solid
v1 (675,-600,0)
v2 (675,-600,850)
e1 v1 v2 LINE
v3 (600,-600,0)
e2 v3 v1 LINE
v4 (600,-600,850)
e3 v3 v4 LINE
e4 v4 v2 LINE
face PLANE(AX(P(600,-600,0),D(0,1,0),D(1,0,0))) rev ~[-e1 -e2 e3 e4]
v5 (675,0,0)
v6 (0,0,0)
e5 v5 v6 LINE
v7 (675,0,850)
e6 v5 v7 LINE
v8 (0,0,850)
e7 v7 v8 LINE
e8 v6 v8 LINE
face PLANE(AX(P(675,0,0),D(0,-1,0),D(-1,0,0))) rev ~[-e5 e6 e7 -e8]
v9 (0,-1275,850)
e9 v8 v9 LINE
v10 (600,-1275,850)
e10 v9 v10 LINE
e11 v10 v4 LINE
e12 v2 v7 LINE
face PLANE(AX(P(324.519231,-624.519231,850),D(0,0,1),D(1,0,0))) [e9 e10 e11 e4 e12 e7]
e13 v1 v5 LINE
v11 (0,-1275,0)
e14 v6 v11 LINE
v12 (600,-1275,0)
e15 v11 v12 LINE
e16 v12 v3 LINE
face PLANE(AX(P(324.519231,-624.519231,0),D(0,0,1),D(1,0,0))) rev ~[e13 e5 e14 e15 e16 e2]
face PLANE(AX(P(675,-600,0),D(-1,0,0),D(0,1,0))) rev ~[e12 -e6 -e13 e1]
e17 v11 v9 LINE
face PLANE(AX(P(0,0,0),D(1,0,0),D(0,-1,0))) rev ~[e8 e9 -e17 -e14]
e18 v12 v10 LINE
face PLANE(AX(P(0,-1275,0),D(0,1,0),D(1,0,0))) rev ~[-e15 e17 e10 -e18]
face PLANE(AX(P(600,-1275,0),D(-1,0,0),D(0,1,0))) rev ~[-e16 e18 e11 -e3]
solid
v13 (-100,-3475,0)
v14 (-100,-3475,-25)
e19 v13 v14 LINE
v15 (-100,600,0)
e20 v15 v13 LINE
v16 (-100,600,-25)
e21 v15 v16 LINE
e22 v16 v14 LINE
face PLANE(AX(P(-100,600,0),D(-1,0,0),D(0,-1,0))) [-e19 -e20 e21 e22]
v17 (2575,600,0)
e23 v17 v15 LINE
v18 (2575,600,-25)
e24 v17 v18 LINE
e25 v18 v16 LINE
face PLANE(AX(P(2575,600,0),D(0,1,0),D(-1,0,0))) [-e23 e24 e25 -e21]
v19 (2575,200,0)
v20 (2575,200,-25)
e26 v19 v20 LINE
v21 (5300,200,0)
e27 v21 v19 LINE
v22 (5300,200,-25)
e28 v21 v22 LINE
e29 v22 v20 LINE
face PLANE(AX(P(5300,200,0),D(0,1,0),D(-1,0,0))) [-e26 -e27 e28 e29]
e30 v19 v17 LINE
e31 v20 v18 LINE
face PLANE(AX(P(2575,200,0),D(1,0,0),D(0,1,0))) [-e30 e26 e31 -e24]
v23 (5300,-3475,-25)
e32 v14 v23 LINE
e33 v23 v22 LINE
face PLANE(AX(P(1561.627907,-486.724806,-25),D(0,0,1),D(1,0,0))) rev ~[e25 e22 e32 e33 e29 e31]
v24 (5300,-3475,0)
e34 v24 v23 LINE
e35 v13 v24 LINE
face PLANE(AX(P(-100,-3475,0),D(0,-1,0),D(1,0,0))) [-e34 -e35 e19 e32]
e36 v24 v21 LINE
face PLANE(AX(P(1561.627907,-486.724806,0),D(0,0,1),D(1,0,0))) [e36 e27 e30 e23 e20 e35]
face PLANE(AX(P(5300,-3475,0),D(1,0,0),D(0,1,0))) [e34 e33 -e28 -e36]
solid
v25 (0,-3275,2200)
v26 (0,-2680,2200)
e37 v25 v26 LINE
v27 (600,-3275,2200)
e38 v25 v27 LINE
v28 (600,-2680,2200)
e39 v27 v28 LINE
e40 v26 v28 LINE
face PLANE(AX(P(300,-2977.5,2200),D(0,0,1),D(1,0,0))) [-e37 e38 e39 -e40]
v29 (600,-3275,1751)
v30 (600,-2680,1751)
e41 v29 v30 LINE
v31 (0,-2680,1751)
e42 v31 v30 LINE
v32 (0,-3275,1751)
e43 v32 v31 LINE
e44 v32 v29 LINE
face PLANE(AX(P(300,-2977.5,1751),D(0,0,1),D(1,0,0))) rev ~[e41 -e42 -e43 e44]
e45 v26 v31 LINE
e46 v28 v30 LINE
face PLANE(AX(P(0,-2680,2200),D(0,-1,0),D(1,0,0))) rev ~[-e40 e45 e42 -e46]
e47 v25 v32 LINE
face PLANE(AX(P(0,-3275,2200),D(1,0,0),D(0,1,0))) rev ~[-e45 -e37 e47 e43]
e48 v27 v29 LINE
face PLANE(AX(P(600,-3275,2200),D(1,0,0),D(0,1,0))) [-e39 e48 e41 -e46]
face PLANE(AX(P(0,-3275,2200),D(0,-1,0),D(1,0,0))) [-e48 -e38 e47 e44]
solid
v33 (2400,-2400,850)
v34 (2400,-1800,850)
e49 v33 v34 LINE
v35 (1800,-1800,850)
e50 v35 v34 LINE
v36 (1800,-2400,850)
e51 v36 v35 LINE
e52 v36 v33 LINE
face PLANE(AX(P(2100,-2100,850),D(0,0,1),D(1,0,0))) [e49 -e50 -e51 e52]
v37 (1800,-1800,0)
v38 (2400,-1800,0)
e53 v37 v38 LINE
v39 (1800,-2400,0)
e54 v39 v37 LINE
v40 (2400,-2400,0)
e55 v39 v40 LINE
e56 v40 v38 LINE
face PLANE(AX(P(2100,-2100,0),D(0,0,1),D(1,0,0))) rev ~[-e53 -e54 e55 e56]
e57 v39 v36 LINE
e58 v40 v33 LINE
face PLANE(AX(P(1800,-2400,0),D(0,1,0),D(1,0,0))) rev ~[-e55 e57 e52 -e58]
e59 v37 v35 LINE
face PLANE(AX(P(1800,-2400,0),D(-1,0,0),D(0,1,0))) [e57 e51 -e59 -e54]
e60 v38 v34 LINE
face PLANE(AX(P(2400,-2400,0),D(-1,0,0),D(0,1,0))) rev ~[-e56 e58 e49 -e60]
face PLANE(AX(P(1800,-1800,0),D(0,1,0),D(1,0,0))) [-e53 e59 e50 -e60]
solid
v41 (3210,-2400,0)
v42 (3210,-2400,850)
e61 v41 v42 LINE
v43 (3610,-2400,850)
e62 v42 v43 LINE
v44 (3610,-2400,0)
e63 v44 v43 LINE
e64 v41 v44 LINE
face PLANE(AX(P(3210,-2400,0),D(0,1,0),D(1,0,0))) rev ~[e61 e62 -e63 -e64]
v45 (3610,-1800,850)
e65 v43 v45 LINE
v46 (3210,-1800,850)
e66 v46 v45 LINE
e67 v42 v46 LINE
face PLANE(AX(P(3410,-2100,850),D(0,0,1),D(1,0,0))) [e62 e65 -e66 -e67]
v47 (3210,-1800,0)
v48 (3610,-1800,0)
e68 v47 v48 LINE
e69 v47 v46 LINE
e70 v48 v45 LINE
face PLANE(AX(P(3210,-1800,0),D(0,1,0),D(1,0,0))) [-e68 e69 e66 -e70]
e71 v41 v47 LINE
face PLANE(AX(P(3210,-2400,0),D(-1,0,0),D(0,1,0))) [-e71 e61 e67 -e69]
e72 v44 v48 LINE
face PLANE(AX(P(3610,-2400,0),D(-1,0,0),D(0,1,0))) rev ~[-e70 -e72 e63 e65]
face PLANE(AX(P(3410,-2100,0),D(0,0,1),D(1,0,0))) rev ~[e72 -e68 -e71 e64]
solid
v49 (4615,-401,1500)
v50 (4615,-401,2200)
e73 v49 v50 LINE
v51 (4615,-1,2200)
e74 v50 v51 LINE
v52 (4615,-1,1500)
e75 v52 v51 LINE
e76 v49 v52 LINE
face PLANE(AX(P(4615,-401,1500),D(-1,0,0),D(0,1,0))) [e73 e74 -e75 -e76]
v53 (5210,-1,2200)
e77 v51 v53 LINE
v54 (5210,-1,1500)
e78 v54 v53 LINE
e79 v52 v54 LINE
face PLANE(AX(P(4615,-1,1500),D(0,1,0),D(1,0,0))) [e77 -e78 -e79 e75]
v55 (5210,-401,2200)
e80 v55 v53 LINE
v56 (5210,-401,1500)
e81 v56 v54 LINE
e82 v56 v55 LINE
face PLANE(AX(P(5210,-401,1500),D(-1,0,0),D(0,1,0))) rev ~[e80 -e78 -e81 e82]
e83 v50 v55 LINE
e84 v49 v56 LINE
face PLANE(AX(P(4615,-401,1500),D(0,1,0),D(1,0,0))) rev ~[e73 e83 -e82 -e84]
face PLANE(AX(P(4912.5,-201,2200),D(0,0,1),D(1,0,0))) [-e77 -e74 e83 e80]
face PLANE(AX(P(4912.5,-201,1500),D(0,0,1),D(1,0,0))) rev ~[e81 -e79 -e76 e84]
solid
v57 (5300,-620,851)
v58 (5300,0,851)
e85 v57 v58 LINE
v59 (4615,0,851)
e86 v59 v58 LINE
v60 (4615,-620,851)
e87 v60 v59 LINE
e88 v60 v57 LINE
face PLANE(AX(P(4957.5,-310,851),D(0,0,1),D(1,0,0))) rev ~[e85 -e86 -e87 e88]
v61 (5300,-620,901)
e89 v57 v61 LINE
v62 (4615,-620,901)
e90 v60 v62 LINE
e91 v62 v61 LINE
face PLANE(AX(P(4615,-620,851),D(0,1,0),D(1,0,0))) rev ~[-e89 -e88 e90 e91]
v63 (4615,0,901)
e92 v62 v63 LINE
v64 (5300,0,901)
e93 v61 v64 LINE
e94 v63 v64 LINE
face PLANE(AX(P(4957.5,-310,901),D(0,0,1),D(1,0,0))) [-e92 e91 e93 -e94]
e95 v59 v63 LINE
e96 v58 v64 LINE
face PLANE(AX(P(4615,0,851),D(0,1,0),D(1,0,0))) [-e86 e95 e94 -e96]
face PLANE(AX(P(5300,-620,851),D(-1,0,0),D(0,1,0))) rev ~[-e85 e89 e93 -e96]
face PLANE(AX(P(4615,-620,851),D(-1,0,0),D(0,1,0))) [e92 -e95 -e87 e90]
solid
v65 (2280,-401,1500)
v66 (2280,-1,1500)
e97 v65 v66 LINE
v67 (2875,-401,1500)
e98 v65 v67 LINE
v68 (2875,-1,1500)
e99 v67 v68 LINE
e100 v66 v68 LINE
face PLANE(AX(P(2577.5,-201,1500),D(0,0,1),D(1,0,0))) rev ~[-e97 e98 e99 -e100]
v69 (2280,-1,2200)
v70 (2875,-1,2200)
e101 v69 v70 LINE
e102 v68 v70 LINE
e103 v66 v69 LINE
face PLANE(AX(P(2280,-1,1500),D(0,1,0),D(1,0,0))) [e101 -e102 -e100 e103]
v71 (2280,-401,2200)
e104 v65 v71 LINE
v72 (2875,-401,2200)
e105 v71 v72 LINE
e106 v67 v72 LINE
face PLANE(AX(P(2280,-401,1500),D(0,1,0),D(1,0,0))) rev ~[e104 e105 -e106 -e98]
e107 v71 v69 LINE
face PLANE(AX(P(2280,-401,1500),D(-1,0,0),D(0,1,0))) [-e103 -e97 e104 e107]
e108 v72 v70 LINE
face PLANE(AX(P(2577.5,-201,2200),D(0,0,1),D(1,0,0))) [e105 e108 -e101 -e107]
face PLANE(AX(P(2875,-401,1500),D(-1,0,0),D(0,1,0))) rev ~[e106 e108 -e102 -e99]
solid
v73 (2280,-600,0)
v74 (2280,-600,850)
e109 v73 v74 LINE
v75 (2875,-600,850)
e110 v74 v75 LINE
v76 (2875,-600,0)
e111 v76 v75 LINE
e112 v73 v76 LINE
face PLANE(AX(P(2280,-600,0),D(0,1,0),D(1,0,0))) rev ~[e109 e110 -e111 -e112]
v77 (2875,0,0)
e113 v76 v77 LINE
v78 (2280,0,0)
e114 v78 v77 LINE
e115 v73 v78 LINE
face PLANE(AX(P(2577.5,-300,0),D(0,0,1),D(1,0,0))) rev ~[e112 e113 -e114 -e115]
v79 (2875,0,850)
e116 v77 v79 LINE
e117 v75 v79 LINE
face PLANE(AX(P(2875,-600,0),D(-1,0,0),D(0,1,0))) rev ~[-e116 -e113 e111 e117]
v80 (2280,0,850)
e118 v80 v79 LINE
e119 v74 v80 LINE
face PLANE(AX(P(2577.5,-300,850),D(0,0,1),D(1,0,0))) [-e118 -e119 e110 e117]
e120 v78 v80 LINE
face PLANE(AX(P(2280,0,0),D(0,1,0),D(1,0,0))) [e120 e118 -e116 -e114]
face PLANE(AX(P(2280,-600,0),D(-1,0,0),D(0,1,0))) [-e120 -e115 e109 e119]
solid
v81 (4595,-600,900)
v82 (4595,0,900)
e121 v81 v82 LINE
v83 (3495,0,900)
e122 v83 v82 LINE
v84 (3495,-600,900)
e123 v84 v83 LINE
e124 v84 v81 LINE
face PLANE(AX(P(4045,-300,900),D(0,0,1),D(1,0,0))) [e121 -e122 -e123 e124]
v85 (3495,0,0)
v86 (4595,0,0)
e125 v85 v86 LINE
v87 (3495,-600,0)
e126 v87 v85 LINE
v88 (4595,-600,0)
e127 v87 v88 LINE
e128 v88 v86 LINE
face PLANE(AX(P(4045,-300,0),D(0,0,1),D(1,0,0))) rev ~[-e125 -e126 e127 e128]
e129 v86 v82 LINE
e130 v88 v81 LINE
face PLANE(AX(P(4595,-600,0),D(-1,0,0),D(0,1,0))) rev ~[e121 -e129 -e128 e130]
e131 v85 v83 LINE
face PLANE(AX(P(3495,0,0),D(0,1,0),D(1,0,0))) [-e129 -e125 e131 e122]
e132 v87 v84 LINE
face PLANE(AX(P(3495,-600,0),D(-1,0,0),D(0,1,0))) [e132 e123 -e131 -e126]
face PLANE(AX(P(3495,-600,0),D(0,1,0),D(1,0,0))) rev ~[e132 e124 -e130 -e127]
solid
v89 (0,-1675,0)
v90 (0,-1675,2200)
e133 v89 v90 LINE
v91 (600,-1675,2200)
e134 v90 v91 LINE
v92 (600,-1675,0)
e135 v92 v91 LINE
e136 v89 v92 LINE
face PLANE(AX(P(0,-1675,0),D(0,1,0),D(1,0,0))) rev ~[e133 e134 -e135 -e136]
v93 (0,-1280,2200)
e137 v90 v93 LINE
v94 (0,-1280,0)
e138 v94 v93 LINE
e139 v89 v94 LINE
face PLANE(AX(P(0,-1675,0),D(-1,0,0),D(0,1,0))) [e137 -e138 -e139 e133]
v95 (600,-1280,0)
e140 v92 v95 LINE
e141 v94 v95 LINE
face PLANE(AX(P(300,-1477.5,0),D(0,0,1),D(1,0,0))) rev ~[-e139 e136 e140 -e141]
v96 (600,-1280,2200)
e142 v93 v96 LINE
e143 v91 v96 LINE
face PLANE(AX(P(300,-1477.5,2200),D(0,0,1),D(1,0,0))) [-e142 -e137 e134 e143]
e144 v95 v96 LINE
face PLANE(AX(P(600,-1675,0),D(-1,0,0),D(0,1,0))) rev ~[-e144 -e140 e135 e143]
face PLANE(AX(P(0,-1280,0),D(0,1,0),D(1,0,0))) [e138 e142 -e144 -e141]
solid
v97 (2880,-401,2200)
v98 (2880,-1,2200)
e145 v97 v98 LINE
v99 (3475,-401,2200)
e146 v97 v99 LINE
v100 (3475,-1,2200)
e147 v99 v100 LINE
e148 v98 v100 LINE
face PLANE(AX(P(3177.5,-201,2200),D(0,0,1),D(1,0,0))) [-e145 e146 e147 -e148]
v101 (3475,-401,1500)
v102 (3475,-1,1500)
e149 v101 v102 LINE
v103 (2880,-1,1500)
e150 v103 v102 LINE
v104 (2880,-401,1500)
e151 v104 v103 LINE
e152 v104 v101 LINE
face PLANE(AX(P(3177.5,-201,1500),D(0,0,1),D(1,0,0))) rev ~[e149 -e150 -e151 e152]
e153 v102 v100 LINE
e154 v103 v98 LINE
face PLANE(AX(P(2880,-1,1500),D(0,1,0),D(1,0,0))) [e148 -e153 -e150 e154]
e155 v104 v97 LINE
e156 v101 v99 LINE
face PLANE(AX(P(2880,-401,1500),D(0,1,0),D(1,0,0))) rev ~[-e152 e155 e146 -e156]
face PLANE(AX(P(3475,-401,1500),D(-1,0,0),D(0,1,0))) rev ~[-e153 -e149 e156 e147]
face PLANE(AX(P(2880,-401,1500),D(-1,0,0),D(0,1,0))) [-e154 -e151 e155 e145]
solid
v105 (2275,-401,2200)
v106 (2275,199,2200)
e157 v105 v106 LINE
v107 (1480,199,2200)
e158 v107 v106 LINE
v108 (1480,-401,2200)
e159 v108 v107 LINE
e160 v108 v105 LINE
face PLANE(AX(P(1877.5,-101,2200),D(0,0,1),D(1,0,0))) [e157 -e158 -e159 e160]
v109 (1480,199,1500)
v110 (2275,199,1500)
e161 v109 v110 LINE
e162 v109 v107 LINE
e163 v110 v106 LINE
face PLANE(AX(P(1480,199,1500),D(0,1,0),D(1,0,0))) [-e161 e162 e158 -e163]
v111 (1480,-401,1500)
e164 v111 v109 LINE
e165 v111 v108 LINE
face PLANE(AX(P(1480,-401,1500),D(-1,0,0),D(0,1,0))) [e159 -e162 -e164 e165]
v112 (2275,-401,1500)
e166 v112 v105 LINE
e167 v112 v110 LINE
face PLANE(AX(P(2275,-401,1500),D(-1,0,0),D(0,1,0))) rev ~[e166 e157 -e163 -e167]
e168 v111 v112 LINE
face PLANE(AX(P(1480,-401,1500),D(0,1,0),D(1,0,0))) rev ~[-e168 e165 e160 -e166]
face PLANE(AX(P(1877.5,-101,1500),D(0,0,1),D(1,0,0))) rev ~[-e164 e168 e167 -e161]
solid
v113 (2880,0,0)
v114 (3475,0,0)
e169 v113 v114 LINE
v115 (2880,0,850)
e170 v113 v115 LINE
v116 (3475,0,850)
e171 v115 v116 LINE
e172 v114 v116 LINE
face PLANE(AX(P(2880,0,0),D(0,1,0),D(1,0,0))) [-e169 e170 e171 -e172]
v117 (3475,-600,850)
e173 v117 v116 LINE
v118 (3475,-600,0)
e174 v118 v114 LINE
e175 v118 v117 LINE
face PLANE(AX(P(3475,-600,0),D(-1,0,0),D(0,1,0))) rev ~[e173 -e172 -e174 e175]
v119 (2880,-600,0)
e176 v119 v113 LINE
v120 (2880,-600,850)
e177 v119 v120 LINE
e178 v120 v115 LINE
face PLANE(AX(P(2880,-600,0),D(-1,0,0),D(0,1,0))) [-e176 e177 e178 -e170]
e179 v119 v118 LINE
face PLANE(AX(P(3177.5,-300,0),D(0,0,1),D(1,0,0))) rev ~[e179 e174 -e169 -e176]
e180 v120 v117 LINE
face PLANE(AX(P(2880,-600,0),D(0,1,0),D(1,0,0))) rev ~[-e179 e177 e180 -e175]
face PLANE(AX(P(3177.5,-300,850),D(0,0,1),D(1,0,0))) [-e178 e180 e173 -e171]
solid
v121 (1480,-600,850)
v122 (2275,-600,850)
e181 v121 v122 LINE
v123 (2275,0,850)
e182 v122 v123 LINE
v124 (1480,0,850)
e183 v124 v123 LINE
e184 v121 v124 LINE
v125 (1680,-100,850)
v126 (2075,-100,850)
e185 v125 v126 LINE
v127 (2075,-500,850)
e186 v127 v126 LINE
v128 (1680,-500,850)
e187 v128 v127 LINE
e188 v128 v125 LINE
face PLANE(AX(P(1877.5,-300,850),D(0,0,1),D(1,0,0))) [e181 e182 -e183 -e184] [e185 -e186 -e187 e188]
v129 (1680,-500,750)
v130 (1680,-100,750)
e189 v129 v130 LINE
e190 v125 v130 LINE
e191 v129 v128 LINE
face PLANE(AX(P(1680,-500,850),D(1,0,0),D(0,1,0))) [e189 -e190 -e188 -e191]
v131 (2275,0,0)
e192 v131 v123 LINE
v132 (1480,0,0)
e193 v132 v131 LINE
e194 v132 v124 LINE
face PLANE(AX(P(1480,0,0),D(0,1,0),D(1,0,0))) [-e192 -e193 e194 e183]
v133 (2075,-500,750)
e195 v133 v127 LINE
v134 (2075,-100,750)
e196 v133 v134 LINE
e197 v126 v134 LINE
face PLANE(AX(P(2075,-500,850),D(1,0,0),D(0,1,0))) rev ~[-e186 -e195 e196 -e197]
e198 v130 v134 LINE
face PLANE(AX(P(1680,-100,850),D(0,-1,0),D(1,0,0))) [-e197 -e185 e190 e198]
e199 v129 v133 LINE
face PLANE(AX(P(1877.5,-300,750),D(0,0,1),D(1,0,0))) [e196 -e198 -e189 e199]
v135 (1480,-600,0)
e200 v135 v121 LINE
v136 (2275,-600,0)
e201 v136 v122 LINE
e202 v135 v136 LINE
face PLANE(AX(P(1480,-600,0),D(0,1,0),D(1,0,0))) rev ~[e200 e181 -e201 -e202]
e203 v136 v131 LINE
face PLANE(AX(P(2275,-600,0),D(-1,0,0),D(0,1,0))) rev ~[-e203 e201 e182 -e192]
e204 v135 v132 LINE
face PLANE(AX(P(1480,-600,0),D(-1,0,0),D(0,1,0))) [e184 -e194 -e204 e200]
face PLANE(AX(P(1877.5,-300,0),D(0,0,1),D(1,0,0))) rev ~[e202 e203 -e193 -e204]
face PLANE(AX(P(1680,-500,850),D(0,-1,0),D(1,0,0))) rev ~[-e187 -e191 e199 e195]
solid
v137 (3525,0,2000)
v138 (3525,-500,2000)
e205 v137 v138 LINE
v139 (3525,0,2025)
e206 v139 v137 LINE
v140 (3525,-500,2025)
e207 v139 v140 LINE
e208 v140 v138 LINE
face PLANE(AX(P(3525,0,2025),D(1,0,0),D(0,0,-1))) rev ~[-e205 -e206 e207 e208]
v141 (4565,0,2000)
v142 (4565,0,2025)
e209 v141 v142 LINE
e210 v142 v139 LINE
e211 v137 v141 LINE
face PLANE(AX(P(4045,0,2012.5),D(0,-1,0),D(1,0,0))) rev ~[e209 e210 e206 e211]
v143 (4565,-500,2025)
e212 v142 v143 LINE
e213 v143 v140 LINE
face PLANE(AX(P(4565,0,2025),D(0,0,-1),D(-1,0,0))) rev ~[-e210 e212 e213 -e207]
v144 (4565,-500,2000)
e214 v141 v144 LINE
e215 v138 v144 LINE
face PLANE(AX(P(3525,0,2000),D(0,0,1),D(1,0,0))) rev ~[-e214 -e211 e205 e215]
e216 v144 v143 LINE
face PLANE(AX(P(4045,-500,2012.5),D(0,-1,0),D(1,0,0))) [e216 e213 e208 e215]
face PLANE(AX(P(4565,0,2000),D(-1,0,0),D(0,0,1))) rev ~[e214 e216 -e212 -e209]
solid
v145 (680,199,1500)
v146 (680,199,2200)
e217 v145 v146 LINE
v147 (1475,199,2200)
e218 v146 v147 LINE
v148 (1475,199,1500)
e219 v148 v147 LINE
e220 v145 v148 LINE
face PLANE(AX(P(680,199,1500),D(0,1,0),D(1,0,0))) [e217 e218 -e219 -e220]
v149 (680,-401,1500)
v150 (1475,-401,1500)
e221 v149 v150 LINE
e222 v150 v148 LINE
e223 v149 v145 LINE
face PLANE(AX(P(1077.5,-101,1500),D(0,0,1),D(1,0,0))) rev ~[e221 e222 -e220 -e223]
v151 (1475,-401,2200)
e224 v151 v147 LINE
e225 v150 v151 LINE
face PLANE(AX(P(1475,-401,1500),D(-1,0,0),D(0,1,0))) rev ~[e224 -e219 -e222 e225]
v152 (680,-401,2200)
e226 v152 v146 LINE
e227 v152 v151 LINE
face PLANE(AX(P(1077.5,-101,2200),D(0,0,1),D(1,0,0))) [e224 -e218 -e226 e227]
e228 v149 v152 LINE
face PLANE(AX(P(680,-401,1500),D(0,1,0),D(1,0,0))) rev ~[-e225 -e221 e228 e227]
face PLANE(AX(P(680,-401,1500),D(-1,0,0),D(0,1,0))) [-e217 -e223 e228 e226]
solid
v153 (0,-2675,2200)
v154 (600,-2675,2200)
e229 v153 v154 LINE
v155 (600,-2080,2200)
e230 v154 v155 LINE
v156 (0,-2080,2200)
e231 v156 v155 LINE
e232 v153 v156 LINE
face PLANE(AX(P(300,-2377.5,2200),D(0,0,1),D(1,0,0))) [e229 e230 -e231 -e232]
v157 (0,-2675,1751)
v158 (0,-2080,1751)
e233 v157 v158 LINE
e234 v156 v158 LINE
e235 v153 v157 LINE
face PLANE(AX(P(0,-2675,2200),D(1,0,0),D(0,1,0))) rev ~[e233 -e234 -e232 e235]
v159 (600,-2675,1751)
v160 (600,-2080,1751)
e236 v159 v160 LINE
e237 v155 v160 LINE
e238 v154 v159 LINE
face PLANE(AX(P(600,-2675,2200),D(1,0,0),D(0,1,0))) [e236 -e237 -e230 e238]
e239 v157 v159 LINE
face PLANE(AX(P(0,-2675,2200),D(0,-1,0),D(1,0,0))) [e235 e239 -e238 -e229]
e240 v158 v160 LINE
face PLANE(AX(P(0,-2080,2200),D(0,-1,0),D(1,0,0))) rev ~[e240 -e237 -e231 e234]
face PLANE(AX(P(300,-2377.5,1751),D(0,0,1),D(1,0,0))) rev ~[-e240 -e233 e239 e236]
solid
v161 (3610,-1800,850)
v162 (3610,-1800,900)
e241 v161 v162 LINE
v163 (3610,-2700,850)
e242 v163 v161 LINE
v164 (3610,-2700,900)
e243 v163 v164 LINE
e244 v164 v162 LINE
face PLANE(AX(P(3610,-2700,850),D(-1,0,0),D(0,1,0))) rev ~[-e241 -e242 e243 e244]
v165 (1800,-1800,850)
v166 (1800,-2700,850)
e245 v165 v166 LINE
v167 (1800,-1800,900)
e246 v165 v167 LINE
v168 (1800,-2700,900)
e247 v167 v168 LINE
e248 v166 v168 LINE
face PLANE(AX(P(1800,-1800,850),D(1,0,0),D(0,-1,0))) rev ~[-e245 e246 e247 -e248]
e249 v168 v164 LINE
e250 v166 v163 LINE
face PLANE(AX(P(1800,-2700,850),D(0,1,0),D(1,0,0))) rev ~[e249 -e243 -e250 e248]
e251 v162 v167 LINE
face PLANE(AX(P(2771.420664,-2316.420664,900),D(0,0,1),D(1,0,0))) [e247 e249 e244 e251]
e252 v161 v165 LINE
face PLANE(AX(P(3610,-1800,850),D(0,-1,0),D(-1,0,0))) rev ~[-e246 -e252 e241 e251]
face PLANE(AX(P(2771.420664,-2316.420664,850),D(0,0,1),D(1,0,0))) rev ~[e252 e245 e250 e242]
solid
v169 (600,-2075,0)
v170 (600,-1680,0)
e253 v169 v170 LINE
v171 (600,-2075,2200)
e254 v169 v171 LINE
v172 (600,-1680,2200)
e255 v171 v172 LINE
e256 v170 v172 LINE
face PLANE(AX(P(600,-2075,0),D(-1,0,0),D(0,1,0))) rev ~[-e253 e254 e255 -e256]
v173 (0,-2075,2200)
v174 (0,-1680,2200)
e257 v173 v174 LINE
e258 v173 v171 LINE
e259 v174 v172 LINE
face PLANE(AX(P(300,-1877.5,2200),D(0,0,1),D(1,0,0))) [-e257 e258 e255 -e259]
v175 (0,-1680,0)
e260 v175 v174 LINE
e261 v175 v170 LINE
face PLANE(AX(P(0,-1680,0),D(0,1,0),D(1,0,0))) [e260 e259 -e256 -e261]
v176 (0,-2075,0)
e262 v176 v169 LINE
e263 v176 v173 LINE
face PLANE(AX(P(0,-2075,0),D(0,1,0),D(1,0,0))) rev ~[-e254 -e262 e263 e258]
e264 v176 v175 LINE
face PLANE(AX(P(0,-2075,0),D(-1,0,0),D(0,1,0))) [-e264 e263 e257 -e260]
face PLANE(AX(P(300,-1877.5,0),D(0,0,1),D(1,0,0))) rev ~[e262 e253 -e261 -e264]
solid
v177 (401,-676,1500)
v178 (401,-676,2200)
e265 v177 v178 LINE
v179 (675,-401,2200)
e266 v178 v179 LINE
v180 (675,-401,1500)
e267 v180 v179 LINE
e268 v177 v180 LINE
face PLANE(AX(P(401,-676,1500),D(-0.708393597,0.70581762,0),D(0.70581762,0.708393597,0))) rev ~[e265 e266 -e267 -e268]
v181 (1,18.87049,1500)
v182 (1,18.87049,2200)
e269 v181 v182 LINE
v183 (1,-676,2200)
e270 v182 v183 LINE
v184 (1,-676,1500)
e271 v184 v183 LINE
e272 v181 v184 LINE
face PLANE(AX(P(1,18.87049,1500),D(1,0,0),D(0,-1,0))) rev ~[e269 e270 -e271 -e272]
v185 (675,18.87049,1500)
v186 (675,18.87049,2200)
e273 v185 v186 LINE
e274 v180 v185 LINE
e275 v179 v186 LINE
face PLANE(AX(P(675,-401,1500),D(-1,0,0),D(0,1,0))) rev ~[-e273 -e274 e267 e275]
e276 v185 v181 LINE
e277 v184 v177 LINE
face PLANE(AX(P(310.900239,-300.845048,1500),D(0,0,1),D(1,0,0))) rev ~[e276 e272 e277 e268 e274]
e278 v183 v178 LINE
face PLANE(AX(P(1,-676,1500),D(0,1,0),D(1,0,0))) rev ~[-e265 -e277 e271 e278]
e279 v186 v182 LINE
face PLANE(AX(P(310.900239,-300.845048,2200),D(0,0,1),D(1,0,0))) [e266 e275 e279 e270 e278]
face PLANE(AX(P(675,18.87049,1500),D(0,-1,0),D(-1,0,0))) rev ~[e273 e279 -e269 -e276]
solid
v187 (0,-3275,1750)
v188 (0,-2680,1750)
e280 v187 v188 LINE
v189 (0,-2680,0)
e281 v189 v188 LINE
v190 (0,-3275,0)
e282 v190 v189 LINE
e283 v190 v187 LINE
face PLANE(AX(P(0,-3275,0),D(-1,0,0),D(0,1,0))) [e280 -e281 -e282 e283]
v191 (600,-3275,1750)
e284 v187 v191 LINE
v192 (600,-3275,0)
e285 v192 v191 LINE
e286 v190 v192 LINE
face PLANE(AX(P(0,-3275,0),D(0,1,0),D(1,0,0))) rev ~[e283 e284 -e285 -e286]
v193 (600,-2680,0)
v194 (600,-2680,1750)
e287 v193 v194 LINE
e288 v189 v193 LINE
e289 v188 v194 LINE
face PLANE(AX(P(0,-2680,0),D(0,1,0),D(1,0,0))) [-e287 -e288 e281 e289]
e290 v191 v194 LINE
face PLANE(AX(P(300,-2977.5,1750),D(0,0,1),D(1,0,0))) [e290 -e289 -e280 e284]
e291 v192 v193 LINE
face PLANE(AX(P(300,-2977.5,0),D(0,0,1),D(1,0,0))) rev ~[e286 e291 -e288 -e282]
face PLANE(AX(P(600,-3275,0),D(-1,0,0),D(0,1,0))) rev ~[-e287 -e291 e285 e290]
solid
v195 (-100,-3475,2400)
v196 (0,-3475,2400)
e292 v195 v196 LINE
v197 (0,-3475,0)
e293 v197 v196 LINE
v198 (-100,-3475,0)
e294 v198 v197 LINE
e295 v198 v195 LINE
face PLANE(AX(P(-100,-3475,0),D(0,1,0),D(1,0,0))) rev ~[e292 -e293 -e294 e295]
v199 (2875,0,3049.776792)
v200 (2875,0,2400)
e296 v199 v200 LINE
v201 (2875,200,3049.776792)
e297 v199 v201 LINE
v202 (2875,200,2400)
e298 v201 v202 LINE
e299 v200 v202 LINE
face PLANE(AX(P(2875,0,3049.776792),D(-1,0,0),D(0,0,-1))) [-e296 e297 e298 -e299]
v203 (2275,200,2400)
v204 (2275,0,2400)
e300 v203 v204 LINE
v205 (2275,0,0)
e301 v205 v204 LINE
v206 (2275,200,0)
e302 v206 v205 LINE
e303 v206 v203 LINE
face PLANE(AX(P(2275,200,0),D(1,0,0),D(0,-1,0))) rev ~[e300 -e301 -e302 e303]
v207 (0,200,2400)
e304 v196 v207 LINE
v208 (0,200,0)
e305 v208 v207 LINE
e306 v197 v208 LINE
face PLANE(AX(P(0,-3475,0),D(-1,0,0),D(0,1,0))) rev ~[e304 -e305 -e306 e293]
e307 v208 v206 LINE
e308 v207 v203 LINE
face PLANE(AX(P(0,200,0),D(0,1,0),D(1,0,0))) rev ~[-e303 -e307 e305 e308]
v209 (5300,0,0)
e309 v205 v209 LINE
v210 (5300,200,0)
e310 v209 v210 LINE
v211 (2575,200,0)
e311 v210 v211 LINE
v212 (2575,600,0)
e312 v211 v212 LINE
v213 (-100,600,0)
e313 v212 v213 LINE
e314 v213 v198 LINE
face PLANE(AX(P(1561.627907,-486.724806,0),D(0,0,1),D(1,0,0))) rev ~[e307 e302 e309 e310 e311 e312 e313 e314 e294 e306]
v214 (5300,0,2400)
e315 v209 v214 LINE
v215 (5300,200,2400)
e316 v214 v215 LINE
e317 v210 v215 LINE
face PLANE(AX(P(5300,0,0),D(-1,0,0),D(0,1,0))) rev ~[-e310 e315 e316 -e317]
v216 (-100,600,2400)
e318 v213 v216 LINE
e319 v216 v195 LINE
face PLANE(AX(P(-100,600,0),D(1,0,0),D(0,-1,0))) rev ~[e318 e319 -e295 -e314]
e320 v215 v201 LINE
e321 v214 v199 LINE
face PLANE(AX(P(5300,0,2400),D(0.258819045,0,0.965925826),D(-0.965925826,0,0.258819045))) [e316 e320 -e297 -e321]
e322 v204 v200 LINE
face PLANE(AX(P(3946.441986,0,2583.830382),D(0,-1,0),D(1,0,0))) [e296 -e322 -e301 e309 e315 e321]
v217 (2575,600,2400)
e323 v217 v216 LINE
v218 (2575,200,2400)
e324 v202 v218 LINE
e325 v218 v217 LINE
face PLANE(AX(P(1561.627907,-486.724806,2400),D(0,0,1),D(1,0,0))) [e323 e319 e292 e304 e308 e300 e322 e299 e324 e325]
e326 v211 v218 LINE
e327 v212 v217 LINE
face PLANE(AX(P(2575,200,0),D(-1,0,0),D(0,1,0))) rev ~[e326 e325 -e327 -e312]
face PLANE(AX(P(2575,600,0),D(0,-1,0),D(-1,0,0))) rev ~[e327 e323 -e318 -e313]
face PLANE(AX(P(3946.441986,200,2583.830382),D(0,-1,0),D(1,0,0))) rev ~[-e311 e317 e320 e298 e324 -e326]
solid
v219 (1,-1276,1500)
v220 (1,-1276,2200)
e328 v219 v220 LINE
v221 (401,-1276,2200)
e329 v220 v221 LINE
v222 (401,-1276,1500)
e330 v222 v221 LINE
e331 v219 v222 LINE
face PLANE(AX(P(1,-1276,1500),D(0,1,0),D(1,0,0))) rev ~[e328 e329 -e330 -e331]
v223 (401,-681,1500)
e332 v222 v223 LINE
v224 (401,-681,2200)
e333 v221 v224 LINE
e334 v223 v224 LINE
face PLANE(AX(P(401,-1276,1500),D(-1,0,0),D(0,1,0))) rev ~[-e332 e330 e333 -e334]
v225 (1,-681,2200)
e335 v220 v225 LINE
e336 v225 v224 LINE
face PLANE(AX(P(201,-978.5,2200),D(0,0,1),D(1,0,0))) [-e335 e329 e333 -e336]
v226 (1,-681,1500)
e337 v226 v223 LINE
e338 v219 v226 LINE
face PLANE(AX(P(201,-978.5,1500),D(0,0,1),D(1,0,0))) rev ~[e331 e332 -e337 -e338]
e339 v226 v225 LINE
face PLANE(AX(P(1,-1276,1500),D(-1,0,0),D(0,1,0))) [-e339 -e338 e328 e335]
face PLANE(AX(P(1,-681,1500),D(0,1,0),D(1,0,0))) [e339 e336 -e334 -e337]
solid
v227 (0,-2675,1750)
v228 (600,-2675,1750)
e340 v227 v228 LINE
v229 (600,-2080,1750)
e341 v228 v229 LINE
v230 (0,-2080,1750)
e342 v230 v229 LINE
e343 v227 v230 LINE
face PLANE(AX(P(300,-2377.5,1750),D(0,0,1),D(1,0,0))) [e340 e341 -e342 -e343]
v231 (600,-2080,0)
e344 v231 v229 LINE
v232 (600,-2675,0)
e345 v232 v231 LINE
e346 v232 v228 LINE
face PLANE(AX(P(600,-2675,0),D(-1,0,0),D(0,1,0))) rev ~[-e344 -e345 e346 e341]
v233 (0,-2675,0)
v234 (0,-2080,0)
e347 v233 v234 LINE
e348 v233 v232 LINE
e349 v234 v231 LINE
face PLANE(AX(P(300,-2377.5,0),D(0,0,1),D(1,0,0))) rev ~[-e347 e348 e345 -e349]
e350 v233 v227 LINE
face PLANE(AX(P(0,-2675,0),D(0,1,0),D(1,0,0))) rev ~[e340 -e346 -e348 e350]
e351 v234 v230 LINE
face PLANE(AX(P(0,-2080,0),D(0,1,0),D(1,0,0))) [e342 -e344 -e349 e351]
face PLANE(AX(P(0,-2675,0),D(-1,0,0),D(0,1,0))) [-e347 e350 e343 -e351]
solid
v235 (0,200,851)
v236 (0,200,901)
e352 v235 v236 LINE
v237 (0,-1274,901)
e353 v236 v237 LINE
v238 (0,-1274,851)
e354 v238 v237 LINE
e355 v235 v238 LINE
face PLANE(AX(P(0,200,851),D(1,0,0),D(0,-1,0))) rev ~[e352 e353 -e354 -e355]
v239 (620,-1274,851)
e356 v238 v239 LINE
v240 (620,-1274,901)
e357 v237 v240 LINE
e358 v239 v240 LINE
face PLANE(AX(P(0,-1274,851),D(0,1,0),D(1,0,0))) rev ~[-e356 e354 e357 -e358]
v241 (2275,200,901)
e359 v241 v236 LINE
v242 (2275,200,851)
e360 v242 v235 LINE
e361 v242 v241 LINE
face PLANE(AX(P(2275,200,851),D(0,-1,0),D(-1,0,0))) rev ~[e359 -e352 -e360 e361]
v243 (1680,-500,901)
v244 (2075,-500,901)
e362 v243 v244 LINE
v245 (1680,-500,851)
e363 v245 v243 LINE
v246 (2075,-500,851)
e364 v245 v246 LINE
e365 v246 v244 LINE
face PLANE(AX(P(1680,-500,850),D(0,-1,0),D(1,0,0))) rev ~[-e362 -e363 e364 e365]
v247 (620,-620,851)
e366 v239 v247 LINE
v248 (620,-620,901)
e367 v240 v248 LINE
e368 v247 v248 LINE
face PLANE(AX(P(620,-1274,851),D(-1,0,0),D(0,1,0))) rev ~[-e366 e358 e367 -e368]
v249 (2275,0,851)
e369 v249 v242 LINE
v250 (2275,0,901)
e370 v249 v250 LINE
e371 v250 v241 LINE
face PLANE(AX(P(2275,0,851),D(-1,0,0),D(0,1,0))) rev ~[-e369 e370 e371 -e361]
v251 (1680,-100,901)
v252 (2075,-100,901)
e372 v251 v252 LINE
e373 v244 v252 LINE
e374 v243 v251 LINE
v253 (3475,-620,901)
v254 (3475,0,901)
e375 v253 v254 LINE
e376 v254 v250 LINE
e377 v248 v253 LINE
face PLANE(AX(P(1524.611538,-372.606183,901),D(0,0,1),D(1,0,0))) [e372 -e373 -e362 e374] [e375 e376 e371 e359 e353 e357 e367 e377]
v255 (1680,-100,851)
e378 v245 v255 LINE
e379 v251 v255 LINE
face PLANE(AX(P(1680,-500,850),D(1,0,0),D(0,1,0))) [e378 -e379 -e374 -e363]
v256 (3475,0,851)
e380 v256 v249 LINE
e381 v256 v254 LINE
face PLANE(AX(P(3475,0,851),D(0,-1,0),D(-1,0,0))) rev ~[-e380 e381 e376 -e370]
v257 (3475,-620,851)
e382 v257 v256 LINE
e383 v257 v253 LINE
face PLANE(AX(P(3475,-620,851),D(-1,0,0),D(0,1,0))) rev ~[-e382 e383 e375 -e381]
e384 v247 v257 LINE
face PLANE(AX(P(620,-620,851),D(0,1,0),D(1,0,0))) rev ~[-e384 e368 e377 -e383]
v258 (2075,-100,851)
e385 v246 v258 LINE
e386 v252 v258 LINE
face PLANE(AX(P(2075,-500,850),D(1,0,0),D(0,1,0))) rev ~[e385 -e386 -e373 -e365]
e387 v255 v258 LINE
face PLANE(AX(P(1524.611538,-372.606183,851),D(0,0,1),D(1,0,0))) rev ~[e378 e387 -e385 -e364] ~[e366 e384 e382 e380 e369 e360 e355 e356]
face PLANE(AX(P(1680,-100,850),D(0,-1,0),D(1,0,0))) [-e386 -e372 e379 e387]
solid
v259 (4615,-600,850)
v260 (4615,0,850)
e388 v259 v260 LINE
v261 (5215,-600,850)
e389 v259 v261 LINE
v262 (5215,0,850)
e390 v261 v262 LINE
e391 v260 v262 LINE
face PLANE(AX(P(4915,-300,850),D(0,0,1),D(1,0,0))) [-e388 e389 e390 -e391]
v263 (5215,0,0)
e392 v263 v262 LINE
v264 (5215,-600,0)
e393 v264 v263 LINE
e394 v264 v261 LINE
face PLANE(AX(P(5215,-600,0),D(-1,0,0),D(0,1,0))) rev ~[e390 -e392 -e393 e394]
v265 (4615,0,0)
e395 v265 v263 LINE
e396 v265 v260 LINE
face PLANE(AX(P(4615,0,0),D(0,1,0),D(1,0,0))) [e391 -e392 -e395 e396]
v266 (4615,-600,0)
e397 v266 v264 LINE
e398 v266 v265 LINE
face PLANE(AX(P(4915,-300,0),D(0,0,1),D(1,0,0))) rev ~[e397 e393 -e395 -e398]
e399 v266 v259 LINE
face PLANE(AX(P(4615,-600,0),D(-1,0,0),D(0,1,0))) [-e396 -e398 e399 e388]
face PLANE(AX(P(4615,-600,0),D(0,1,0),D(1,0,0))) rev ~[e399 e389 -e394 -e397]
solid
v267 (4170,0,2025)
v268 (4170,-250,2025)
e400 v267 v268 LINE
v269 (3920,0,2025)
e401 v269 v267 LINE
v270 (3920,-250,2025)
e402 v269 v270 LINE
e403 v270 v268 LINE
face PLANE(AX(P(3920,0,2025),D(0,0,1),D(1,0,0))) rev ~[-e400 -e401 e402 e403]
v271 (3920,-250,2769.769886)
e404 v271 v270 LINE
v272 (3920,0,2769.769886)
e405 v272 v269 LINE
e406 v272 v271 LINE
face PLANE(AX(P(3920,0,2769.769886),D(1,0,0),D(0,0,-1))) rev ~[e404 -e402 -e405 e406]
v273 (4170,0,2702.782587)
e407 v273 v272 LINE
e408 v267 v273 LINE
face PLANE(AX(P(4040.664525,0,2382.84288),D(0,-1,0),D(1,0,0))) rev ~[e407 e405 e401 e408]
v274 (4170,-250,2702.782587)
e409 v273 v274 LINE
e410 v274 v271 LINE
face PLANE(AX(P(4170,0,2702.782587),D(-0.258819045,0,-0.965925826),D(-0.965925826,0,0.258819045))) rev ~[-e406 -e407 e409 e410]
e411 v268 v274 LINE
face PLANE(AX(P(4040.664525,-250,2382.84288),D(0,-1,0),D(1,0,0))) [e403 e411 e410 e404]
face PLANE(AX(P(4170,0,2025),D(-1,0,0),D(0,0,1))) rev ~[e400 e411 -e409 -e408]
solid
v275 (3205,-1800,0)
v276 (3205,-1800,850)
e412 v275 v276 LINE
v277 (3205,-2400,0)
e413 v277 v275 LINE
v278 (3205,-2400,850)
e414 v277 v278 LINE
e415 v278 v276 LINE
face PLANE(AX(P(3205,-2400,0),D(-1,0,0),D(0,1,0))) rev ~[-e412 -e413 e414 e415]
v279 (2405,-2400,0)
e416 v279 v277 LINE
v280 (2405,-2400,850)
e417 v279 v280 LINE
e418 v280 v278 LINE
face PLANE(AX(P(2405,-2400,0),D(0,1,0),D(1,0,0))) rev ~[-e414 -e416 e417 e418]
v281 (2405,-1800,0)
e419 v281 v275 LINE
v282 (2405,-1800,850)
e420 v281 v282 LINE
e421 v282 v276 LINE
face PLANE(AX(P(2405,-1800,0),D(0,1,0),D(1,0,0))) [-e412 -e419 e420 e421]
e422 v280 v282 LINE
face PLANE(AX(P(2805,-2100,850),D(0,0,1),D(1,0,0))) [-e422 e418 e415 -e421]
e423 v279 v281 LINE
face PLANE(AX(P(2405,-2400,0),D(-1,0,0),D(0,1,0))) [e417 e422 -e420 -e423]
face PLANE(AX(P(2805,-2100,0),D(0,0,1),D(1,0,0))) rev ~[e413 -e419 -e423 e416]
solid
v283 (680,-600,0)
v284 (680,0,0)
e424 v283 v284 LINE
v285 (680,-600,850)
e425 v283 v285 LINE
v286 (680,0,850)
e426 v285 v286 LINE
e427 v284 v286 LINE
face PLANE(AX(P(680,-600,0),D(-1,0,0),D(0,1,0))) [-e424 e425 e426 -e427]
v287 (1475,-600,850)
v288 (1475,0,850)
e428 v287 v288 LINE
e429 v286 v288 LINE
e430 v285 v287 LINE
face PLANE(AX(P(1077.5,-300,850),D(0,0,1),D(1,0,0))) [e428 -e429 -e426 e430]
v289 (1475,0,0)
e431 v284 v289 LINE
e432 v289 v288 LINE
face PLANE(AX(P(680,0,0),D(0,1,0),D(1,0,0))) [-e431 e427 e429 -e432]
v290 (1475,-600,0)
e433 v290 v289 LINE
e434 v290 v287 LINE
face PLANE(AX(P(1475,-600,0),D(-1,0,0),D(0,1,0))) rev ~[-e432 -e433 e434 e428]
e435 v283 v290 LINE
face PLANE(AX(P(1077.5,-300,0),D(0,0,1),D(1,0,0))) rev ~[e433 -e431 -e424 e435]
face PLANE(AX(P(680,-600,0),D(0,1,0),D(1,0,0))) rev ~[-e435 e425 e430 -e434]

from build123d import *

# Parameters (mm, degrees)
F1_DEPTH  = 2400
F3_DEPTH  = 850
F4_W      = 600
F4_H      = 395
F5_DEPTH  = 2200
F6_DEPTH  = 2200
F4_H_2    = 595
F7_DEPTH  = 1750
F8_DEPTH  = 1750
F2_W      = 795
F2_H      = 600
F9_DEPTH  = 850
F10_DEPTH = 850
F2_W_2    = 595
F11_DEPTH = 850
F12_DEPTH = 850
F2_W_3    = 1100
F13_DEPTH = 900
F2_W_4    = 600
F14_DEPTH = 850
F16_W     = 795
F16_H     = 600
F17_DEPTH = 700
F18_DEPTH = 700
F19_DEPTH = 25
F16_W_2   = 595
F16_H_2   = 400
F20_DEPTH = 700
F22_DEPTH = 200
F24_DEPTH = 250
F25_DEPTH = 500
F26_DEPTH = 700
F16_W_3   = 400
F16_H_3   = 595
F27_DEPTH = 700
F31_DEPTH = 50
F30_W     = 685
F30_H     = 620
F28_W     = 395
F28_H     = 400
F32_DEPTH = 100
F33_W     = 600
F33_H     = 595
F34_DEPTH = 449
F35_W     = 600
F35_H     = 600
F36_DEPTH = 850
F35_W_2   = 800
F35_W_3   = 400
F37_W     = 600
F37_H     = 600
F38_DEPTH = 50


# Not quite as in the source:
# - a feature names something its author has since deleted; it is built from what else it names


with BuildPart() as f1:
    # F0 (on Top) → F1 (new body)
    with BuildSketch(Plane.XY):
        Polygon((0, -3475), (0, 200), (2275, 200), (2275, 0), (5300, 0), (5300, 200), (2575, 200), (2575, 600), (-100, 600), (-100, -3475), align=None)
    extrude(amount=F1_DEPTH)

    # F21 (on face) → F22 (join)
    with BuildSketch(Plane.XZ):
        Polygon((2875, 2400), (5300, 2400), (2875, 3049.7767916455), align=None)
    extrude(amount=-F22_DEPTH)


with BuildPart() as f3:
    # F2 (on Top) → F3 (new body)
    with BuildSketch(Plane.XY):
        Polygon((675, 0), (0, 0), (0, -1275), (600, -1275), (600, -600), (675, -600), align=None)
    extrude(amount=F3_DEPTH)


with BuildPart() as f5:
    # F4 (on Top) → F5 (new body)
    with BuildSketch(Plane.XY):
        with Locations((300, -1477.5)):
            Rectangle(F4_W, F4_H)
    extrude(amount=F5_DEPTH)


with BuildPart() as f6:
    # F4 (on Top) → F6 (new body)
    with BuildSketch(Plane.XY):
        with Locations((300, -1877.5)):
            Rectangle(F4_W, F4_H)
    extrude(amount=F6_DEPTH)


with BuildPart() as f7:
    # F4 (on Top) → F7 (new body)
    with BuildSketch(Plane.XY):
        with Locations((300, -2377.5)):
            Rectangle(F4_W, F4_H_2)
    extrude(amount=F7_DEPTH)


with BuildPart() as f8:
    # F4 (on Top) → F8 (new body)
    with BuildSketch(Plane.XY):
        with Locations((300, -2977.5)):
            Rectangle(F4_W, F4_H_2)
    extrude(amount=F8_DEPTH)


with BuildPart() as f9:
    # F2 (on Top) → F9 (new body)
    with BuildSketch(Plane.XY):
        with Locations((1077.5, -300)):
            Rectangle(F2_W, F2_H)
    extrude(amount=F9_DEPTH)


with BuildPart() as f10:
    # F2 (on Top) → F10 (new body)
    with BuildSketch(Plane.XY):
        with Locations((1877.5, -300)):
            Rectangle(F2_W, F2_H)
    extrude(amount=F10_DEPTH)


with BuildPart() as f11:
    # F2 (on Top) → F11 (new body)
    with BuildSketch(Plane.XY):
        with Locations((2577.5, -300)):
            Rectangle(F2_W_2, F2_H)
    extrude(amount=F11_DEPTH)


with BuildPart() as f12:
    # F2 (on Top) → F12 (new body)
    with BuildSketch(Plane.XY):
        with Locations((3177.5, -300)):
            Rectangle(F2_W_2, F2_H)
    extrude(amount=F12_DEPTH)


with BuildPart() as f13:
    # F2 (on Top) → F13 (new body)
    with BuildSketch(Plane.XY):
        with Locations((4045, -300)):
            Rectangle(F2_W_3, F2_H)
    extrude(amount=F13_DEPTH)


with BuildPart() as f14:
    # F2 (on Top) → F14 (new body)
    with BuildSketch(Plane.XY):
        with Locations((4915, -300)):
            Rectangle(F2_W_4, F2_H)
    extrude(amount=F14_DEPTH)


with BuildPart() as f17:
    # F16 (on offset) → F17 (new body)
    with BuildSketch(Plane.XY.offset(1500)):
        with Locations((1077.5, -101)):
            Rectangle(F16_W, F16_H)
    extrude(amount=F17_DEPTH)


with BuildPart() as f18:
    # F16 (on offset) → F18 (new body)
    with BuildSketch(Plane.XY.offset(1500)):
        with Locations((1877.5, -101)):
            Rectangle(F16_W, F16_H)
    extrude(amount=F18_DEPTH)


with BuildPart() as f19:
    # F0 (on Top) → F19 (new body)
    with BuildSketch(Plane.XY):
        Polygon((0, -3475), (0, 200), (2275, 200), (2275, 0), (5300, 0), (5300, 200), (2575, 200), (2575, 600), (-100, 600), (-100, -3475), align=None)
        Polygon((2275, 200), (0, 200), (0, -3475), (5300, -3475), (5300, 0), (2275, 0), align=None)
    extrude(amount=-F19_DEPTH)


with BuildPart() as f20:
    # F16 (on offset) → F20 (new body)
    with BuildSketch(Plane.XY.offset(1500)):
        with Locations((2577.5, -201)):
            Rectangle(F16_W_2, F16_H_2)
    extrude(amount=F20_DEPTH)


with BuildPart() as f20b:
    # F16 (on offset) → F20, piece 2 (new body)
    with BuildSketch(Plane.XY.offset(1500)):
        with Locations((3177.5, -201)):
            Rectangle(F16_W_2, F16_H_2)
    extrude(amount=F20_DEPTH)


with BuildPart() as f20c:
    # F16 (on offset) → F20, piece 3 (new body)
    with BuildSketch(Plane.XY.offset(1500)):
        with Locations((4912.5, -201)):
            Rectangle(F16_W_2, F16_H_2)
    extrude(amount=F20_DEPTH)


with BuildPart() as f24:
    # F23 (on face) → F24 (new body)
    with BuildSketch(Plane.XZ):
        Polygon((3920, 2769.769885555), (3920, 2025), (4170, 2025), (4170, 2702.7825874472), align=None)
    extrude(amount=F24_DEPTH)


with BuildPart() as f25:
    # F23 (on face) → F25 (new body)
    with BuildSketch(Plane.XZ):
        Polygon((3525, 2025), (3525, 2000), (4565, 2000), (4565, 2025), (4170, 2025), (3920, 2025), align=None)
    extrude(amount=F25_DEPTH)


with BuildPart() as f26:
    # F16 (on offset) → F26 (new body)
    with BuildSketch(Plane.XY.offset(1500)):
        Polygon((675, 18.8704896718), (1, 18.8704896718), (1, -676), (401, -676), (675, -401), align=None)
    extrude(amount=F26_DEPTH)


with BuildPart() as f27:
    # F16 (on offset) → F27 (new body)
    with BuildSketch(Plane.XY.offset(1500)):
        with Locations((201, -978.5)):
            Rectangle(F16_W_3, F16_H_3)
    extrude(amount=F27_DEPTH)


with BuildPart() as f31:
    # F30 (on offset) → F31 (new body)
    with BuildSketch(Plane.XY.offset(851)):
        Polygon((2275, 200), (0, 200), (0, -1274), (620, -1274), (620, -620), (3475, -620), (3475, 0), (2275, 0), align=None)
    extrude(amount=F31_DEPTH)


with BuildPart() as f31b:
    # F30 (on offset) → F31, piece 2 (new body)
    with BuildSketch(Plane.XY.offset(851)):
        with Locations((4957.5, -310)):
            Rectangle(F30_W, F30_H)
    extrude(amount=F31_DEPTH)


with BuildPart() as f32_tool:
    # F28 (on face) → F32 (new body, symmetric)
    with BuildSketch(Plane.XY.offset(850)):
        with Locations((1877.5, -300)):
            Rectangle(F28_W, F28_H)
    extrude(amount=F32_DEPTH, both=True)


with BuildPart() as f10_1:
    add(f10.part)

    # F32: cut by f32_tool
    add(f32_tool.part, mode=Mode.SUBTRACT)


with BuildPart() as f31_1:
    add(f31.part)

    # F32: cut by f32_tool
    add(f32_tool.part, mode=Mode.SUBTRACT)


with BuildPart() as f34:
    # F33 (on face) → F34 (new body)
    with BuildSketch(Plane.XY.offset(2200)):
        with Locations((300, -2977.5)):
            Rectangle(F33_W, F33_H)
    extrude(amount=-F34_DEPTH)


with BuildPart() as f34b:
    # F33 (on face) → F34, piece 2 (new body)
    with BuildSketch(Plane.XY.offset(2200)):
        with Locations((300, -2377.5)):
            Rectangle(F33_W, F33_H)
    extrude(amount=-F34_DEPTH)


with BuildPart() as f36:
    # F35 (on face) → F36 (new body)
    with BuildSketch(Plane.XY):
        with Locations((2100, -2100)):
            Rectangle(F35_W, F35_H)
    extrude(amount=F36_DEPTH)


with BuildPart() as f36b:
    # F35 (on face) → F36, piece 2 (new body)
    with BuildSketch(Plane.XY):
        with Locations((2805, -2100)):
            Rectangle(F35_W_2, F35_H)
    extrude(amount=F36_DEPTH)


with BuildPart() as f36c:
    # F35 (on face) → F36, piece 3 (new body)
    with BuildSketch(Plane.XY):
        with Locations((3410, -2100)):
            Rectangle(F35_W_3, F35_H)
    extrude(amount=F36_DEPTH)


with BuildPart() as f38:
    # F37 (on face) → F38 (new body)
    with BuildSketch(Plane.XY.offset(850)):
        Polygon((3610, -1800), (2400, -1800), (2400, -2400), (1800, -2400), (1800, -2700), (3610, -2700), align=None)
        with Locations((2100, -2100)):
            Rectangle(F37_W, F37_H)
    extrude(amount=F38_DEPTH)


solid = Compound([f1.part, f3.part, f5.part, f6.part, f7.part, f8.part, f9.part, f11.part, f12.part, f13.part, f14.part, f17.part, f18.part, f19.part, f20.part, f20b.part, f20c.part, f24.part, f25.part, f26.part, f27.part, f31b.part, f10_1.part, f31_1.part, f34.part, f34b.part, f36.part, f36b.part, f36c.part, f38.part])
